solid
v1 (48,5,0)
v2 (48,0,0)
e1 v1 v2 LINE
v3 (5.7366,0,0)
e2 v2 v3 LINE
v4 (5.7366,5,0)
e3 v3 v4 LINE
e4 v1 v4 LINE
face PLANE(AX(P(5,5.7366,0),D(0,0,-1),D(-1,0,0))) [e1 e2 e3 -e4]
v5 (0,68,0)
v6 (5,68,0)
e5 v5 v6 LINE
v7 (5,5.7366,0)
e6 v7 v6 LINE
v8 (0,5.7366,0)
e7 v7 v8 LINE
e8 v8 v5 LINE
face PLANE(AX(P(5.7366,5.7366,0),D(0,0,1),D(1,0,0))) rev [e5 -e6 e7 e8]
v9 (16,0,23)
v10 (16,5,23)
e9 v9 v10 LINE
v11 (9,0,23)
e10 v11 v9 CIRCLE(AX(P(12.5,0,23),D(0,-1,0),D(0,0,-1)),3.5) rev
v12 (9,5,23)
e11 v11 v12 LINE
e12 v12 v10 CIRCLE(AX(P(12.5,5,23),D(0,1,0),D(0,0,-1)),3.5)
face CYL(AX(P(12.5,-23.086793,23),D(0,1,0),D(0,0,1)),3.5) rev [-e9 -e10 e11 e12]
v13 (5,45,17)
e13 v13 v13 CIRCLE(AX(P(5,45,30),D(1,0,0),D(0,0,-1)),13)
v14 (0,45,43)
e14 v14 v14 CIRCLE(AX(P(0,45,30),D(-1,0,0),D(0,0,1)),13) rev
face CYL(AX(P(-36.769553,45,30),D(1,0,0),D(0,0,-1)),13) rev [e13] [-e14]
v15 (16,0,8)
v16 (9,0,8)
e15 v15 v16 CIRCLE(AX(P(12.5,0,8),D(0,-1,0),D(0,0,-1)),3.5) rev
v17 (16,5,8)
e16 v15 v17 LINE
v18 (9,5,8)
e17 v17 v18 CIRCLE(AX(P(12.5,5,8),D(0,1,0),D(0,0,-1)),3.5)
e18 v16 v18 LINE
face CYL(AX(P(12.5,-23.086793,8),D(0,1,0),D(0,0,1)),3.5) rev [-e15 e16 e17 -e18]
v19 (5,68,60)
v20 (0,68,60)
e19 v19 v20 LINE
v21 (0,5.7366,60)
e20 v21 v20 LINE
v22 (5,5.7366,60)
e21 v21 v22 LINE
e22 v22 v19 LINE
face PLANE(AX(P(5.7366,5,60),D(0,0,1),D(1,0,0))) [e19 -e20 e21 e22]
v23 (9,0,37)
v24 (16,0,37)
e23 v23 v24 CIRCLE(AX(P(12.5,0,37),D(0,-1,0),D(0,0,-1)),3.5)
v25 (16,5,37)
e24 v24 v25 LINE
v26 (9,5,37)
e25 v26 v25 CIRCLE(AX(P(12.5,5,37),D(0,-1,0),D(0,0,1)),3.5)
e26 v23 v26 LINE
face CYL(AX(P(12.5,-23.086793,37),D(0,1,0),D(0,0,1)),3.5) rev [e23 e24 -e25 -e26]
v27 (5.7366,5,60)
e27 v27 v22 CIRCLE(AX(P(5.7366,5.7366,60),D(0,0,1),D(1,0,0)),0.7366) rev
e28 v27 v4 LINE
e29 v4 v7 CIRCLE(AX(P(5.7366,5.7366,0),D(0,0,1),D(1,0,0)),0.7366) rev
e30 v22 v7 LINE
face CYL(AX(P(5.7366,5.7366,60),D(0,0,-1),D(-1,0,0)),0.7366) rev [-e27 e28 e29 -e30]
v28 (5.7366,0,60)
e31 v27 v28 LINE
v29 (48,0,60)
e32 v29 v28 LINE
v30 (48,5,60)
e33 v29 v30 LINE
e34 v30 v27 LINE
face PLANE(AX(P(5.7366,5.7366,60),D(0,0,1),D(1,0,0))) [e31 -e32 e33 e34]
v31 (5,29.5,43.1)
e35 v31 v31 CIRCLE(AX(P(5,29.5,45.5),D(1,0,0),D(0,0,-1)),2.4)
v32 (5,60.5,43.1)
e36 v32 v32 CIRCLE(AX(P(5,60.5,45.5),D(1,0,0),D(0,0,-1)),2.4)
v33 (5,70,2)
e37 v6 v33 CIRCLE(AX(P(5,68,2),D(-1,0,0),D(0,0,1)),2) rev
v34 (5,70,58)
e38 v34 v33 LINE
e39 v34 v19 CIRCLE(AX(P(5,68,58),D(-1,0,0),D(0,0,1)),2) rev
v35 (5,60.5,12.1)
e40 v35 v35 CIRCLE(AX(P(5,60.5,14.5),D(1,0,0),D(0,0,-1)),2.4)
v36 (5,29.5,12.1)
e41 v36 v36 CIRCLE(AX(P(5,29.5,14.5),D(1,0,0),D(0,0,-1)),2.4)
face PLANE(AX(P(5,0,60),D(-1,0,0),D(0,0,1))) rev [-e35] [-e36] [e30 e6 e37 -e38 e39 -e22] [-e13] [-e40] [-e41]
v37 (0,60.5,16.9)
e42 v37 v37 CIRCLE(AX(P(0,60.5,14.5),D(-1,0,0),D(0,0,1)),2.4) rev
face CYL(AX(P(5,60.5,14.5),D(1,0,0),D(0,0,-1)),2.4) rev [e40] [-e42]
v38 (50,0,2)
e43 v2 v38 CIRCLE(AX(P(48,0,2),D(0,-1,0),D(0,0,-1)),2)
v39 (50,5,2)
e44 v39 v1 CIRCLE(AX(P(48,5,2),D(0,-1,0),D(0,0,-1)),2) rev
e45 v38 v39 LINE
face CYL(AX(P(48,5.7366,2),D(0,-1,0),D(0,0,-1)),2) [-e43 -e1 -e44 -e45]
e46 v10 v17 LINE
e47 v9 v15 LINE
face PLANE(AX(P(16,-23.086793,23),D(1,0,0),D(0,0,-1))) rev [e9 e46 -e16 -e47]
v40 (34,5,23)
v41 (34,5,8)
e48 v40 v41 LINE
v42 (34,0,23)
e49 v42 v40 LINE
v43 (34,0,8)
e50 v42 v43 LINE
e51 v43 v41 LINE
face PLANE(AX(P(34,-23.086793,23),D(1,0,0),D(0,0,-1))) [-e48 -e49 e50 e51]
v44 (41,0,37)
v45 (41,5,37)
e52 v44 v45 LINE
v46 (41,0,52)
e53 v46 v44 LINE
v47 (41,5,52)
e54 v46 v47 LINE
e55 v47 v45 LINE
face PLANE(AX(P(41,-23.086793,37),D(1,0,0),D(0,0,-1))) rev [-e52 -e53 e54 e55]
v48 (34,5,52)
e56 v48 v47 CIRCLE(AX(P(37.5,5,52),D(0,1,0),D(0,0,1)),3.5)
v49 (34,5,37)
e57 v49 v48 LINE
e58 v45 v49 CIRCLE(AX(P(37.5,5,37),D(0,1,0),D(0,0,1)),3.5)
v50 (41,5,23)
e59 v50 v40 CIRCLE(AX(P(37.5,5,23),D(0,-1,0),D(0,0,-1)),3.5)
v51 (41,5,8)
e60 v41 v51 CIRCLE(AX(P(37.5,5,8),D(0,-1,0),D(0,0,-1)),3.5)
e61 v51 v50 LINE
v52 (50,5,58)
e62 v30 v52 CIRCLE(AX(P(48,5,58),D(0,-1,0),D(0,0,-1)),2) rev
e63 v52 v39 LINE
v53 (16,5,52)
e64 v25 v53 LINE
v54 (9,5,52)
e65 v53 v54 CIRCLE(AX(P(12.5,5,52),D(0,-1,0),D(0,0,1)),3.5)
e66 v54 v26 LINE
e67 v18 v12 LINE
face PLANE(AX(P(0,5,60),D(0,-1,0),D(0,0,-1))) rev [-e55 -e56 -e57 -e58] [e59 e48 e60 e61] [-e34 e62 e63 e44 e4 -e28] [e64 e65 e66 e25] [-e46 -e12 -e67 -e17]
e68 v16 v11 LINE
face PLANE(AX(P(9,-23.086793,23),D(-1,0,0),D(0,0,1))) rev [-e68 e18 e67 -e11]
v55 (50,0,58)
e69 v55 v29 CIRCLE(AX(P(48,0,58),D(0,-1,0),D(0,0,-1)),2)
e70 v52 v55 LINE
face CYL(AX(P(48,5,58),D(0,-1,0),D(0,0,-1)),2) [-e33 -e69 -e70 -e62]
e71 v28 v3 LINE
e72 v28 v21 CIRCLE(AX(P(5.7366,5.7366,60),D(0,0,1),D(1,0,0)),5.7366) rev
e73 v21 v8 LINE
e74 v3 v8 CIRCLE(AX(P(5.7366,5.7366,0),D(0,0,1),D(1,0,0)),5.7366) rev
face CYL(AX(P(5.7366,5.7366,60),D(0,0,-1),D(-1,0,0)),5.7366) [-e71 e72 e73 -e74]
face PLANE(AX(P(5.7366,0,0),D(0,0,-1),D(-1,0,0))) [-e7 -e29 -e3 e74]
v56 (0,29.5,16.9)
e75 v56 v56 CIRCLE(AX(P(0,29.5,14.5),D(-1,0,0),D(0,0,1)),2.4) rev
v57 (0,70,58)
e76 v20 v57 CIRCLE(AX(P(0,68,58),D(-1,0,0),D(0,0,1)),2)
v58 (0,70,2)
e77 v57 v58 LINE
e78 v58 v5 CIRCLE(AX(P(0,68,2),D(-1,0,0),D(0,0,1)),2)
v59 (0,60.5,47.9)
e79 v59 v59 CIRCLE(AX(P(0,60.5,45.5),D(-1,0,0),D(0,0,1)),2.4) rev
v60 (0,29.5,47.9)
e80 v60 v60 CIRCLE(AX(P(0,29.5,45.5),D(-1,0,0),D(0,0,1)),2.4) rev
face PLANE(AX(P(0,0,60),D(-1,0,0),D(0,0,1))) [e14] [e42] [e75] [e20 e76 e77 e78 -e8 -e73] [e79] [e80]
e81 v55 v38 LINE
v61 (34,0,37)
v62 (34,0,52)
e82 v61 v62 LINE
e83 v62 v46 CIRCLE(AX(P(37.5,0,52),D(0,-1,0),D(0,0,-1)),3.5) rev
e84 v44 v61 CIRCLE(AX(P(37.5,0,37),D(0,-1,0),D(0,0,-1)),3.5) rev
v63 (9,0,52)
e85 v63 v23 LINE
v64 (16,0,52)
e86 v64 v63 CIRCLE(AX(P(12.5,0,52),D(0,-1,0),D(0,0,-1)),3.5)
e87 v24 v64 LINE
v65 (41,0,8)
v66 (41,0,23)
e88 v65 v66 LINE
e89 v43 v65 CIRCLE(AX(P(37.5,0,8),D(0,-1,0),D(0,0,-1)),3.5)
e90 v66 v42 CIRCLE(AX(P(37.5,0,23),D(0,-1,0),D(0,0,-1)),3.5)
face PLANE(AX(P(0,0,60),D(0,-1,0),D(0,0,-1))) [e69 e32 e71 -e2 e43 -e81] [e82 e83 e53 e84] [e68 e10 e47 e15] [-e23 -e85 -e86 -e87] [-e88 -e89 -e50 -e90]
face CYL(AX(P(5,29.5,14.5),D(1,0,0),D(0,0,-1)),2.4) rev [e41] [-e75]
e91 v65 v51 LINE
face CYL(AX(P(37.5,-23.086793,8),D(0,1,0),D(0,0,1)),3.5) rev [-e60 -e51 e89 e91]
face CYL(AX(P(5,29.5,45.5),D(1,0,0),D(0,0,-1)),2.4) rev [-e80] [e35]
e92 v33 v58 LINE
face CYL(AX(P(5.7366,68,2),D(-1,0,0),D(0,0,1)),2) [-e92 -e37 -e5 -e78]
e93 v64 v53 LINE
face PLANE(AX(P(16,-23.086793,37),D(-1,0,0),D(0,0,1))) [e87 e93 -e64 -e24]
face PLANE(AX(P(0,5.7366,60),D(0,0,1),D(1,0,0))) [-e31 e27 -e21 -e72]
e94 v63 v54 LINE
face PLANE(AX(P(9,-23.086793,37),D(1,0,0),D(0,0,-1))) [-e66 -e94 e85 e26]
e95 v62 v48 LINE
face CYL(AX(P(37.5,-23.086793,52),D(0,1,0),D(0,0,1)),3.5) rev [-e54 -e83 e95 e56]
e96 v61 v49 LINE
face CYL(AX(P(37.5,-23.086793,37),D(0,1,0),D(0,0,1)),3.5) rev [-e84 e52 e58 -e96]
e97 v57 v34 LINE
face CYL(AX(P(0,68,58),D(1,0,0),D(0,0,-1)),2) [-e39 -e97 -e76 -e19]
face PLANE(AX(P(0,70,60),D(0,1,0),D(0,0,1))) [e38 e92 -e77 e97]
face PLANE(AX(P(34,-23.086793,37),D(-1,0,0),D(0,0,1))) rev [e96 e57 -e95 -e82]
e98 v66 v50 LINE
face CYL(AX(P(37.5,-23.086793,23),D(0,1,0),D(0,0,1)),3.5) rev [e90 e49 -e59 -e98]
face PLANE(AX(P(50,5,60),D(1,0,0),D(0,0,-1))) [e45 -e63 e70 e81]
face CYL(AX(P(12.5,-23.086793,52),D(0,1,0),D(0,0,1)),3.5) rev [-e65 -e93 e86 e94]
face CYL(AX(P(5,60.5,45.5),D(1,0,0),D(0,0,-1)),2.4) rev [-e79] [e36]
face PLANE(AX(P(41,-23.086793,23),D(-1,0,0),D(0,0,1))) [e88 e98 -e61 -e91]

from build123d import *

# Parameters (mm, degrees)
SM_BASE_FLANGE_1_DEPTH   = 60
SKETCH_6_R               = 13
CUT_EXTRUDE_1_DEPTH      = 5
HOLE_WIZARD_M4_1_D       = 4.8
PATTERN_CIRCULAR_1_COUNT = 4
CUT_EXTRUDE_2_DEPTH      = 5
MIRROR_3_COPY_1_DEPTH    = 5
FILLET_1_R               = 2


# Sheet-metal steps are written as plain solids
with BuildPart() as part:
    # Sketch 1 → 基体-法兰1 (new body)
    with BuildSketch(Plane.XY):
        with BuildLine():
            Line((0, 70), (0, 5.7366))
            ThreePointArc((0, 5.7366), (1.680211239, 1.680211239), (5.7366, 0))
            Line((5.7366, 0), (50, 0))
            Line((50, 0), (50, 5))
            Line((50, 5), (5.7366, 5))
            ThreePointArc((5.7366, 5), (5.215745145, 5.215745145), (5, 5.7366))
            Line((5, 5.7366), (5, 70))
            Line((5, 70), (0, 70))
        make_face()
    extrude(amount=SM_BASE_FLANGE_1_DEPTH)

    # 草图6 → 切除-拉伸1 (cut)
    with BuildSketch(Plane(origin=(5, 0, 0), x_dir=(0, 0, -1), z_dir=(1, 0, 0))):
        with Locations((-30, 45)):
            Circle(SKETCH_6_R)
    extrude(amount=-CUT_EXTRUDE_1_DEPTH, mode=Mode.SUBTRACT)

    # M4 间隙孔1 (through all)
    with Locations(Plane(origin=(5, 60.5, 45.5), x_dir=(0, 0, 1), z_dir=(1, 0, 0))):
        with Locations((0, 0)):
            hole_wizard_m4_1 = Hole(HOLE_WIZARD_M4_1_D / 2)

    # 阵列(圆周)1: M4 间隙孔1 ×4 about axis
    pattern_circular_1_axis = Axis((0, 45, 30), (1, 0, 0))
    for i in range(1, PATTERN_CIRCULAR_1_COUNT):
        add(hole_wizard_m4_1.rotate(pattern_circular_1_axis, i * 360 / PATTERN_CIRCULAR_1_COUNT), mode=Mode.SUBTRACT)

    # 草图9 → 切除-拉伸2 (cut)
    with BuildSketch(Plane(origin=(0, 5, 0), x_dir=(1, 0, 0), z_dir=(0, 1, 0))):
        with BuildLine():
            Line((41, -37), (41, -52))
            ThreePointArc((41, -52), (37.5, -55.5), (34, -52))
            Line((34, -52), (34, -37))
            ThreePointArc((34, -37), (37.5, -33.5), (41, -37))
        make_face()
    cut_extrude_2 = extrude(amount=-CUT_EXTRUDE_2_DEPTH, mode=Mode.SUBTRACT)

    # 镜向2: 切除-拉伸2 across plane
    add(cut_extrude_2.mirror(Plane(origin=(25, 0, 0), x_dir=(0, 0, 1), z_dir=(1, 0, 0))), mode=Mode.SUBTRACT)

    # 镜向3: 切除-拉伸2 across plane
    add(cut_extrude_2.mirror(Plane.XY.offset(30)), mode=Mode.SUBTRACT)

    # 镜向3 copy 1 sketch → 镜向3 copy 1 (cut)
    with BuildSketch(Plane(origin=(50, 5, 60), x_dir=(-1, 0, 0), z_dir=(0, 1, 0))):
        with BuildLine():
            Line((41, -37), (41, -52))
            ThreePointArc((41, -52), (37.5, -55.5), (34, -52))
            Line((34, -52), (34, -37))
            ThreePointArc((34, -37), (37.5, -33.5), (41, -37))
        make_face()
    extrude(amount=-MIRROR_3_COPY_1_DEPTH, mode=Mode.SUBTRACT)

    # 圆角1
    fillet_1_edges = [part.edges().sort_by_distance(p)[0] for p in [
        (50, 2.5, 60),
        (50, 2.5, 0),
        (2.5, 70, 60),
        (2.5, 70, 0),
    ]]
    fillet(fillet_1_edges, radius=FILLET_1_R)


solid = part.part
